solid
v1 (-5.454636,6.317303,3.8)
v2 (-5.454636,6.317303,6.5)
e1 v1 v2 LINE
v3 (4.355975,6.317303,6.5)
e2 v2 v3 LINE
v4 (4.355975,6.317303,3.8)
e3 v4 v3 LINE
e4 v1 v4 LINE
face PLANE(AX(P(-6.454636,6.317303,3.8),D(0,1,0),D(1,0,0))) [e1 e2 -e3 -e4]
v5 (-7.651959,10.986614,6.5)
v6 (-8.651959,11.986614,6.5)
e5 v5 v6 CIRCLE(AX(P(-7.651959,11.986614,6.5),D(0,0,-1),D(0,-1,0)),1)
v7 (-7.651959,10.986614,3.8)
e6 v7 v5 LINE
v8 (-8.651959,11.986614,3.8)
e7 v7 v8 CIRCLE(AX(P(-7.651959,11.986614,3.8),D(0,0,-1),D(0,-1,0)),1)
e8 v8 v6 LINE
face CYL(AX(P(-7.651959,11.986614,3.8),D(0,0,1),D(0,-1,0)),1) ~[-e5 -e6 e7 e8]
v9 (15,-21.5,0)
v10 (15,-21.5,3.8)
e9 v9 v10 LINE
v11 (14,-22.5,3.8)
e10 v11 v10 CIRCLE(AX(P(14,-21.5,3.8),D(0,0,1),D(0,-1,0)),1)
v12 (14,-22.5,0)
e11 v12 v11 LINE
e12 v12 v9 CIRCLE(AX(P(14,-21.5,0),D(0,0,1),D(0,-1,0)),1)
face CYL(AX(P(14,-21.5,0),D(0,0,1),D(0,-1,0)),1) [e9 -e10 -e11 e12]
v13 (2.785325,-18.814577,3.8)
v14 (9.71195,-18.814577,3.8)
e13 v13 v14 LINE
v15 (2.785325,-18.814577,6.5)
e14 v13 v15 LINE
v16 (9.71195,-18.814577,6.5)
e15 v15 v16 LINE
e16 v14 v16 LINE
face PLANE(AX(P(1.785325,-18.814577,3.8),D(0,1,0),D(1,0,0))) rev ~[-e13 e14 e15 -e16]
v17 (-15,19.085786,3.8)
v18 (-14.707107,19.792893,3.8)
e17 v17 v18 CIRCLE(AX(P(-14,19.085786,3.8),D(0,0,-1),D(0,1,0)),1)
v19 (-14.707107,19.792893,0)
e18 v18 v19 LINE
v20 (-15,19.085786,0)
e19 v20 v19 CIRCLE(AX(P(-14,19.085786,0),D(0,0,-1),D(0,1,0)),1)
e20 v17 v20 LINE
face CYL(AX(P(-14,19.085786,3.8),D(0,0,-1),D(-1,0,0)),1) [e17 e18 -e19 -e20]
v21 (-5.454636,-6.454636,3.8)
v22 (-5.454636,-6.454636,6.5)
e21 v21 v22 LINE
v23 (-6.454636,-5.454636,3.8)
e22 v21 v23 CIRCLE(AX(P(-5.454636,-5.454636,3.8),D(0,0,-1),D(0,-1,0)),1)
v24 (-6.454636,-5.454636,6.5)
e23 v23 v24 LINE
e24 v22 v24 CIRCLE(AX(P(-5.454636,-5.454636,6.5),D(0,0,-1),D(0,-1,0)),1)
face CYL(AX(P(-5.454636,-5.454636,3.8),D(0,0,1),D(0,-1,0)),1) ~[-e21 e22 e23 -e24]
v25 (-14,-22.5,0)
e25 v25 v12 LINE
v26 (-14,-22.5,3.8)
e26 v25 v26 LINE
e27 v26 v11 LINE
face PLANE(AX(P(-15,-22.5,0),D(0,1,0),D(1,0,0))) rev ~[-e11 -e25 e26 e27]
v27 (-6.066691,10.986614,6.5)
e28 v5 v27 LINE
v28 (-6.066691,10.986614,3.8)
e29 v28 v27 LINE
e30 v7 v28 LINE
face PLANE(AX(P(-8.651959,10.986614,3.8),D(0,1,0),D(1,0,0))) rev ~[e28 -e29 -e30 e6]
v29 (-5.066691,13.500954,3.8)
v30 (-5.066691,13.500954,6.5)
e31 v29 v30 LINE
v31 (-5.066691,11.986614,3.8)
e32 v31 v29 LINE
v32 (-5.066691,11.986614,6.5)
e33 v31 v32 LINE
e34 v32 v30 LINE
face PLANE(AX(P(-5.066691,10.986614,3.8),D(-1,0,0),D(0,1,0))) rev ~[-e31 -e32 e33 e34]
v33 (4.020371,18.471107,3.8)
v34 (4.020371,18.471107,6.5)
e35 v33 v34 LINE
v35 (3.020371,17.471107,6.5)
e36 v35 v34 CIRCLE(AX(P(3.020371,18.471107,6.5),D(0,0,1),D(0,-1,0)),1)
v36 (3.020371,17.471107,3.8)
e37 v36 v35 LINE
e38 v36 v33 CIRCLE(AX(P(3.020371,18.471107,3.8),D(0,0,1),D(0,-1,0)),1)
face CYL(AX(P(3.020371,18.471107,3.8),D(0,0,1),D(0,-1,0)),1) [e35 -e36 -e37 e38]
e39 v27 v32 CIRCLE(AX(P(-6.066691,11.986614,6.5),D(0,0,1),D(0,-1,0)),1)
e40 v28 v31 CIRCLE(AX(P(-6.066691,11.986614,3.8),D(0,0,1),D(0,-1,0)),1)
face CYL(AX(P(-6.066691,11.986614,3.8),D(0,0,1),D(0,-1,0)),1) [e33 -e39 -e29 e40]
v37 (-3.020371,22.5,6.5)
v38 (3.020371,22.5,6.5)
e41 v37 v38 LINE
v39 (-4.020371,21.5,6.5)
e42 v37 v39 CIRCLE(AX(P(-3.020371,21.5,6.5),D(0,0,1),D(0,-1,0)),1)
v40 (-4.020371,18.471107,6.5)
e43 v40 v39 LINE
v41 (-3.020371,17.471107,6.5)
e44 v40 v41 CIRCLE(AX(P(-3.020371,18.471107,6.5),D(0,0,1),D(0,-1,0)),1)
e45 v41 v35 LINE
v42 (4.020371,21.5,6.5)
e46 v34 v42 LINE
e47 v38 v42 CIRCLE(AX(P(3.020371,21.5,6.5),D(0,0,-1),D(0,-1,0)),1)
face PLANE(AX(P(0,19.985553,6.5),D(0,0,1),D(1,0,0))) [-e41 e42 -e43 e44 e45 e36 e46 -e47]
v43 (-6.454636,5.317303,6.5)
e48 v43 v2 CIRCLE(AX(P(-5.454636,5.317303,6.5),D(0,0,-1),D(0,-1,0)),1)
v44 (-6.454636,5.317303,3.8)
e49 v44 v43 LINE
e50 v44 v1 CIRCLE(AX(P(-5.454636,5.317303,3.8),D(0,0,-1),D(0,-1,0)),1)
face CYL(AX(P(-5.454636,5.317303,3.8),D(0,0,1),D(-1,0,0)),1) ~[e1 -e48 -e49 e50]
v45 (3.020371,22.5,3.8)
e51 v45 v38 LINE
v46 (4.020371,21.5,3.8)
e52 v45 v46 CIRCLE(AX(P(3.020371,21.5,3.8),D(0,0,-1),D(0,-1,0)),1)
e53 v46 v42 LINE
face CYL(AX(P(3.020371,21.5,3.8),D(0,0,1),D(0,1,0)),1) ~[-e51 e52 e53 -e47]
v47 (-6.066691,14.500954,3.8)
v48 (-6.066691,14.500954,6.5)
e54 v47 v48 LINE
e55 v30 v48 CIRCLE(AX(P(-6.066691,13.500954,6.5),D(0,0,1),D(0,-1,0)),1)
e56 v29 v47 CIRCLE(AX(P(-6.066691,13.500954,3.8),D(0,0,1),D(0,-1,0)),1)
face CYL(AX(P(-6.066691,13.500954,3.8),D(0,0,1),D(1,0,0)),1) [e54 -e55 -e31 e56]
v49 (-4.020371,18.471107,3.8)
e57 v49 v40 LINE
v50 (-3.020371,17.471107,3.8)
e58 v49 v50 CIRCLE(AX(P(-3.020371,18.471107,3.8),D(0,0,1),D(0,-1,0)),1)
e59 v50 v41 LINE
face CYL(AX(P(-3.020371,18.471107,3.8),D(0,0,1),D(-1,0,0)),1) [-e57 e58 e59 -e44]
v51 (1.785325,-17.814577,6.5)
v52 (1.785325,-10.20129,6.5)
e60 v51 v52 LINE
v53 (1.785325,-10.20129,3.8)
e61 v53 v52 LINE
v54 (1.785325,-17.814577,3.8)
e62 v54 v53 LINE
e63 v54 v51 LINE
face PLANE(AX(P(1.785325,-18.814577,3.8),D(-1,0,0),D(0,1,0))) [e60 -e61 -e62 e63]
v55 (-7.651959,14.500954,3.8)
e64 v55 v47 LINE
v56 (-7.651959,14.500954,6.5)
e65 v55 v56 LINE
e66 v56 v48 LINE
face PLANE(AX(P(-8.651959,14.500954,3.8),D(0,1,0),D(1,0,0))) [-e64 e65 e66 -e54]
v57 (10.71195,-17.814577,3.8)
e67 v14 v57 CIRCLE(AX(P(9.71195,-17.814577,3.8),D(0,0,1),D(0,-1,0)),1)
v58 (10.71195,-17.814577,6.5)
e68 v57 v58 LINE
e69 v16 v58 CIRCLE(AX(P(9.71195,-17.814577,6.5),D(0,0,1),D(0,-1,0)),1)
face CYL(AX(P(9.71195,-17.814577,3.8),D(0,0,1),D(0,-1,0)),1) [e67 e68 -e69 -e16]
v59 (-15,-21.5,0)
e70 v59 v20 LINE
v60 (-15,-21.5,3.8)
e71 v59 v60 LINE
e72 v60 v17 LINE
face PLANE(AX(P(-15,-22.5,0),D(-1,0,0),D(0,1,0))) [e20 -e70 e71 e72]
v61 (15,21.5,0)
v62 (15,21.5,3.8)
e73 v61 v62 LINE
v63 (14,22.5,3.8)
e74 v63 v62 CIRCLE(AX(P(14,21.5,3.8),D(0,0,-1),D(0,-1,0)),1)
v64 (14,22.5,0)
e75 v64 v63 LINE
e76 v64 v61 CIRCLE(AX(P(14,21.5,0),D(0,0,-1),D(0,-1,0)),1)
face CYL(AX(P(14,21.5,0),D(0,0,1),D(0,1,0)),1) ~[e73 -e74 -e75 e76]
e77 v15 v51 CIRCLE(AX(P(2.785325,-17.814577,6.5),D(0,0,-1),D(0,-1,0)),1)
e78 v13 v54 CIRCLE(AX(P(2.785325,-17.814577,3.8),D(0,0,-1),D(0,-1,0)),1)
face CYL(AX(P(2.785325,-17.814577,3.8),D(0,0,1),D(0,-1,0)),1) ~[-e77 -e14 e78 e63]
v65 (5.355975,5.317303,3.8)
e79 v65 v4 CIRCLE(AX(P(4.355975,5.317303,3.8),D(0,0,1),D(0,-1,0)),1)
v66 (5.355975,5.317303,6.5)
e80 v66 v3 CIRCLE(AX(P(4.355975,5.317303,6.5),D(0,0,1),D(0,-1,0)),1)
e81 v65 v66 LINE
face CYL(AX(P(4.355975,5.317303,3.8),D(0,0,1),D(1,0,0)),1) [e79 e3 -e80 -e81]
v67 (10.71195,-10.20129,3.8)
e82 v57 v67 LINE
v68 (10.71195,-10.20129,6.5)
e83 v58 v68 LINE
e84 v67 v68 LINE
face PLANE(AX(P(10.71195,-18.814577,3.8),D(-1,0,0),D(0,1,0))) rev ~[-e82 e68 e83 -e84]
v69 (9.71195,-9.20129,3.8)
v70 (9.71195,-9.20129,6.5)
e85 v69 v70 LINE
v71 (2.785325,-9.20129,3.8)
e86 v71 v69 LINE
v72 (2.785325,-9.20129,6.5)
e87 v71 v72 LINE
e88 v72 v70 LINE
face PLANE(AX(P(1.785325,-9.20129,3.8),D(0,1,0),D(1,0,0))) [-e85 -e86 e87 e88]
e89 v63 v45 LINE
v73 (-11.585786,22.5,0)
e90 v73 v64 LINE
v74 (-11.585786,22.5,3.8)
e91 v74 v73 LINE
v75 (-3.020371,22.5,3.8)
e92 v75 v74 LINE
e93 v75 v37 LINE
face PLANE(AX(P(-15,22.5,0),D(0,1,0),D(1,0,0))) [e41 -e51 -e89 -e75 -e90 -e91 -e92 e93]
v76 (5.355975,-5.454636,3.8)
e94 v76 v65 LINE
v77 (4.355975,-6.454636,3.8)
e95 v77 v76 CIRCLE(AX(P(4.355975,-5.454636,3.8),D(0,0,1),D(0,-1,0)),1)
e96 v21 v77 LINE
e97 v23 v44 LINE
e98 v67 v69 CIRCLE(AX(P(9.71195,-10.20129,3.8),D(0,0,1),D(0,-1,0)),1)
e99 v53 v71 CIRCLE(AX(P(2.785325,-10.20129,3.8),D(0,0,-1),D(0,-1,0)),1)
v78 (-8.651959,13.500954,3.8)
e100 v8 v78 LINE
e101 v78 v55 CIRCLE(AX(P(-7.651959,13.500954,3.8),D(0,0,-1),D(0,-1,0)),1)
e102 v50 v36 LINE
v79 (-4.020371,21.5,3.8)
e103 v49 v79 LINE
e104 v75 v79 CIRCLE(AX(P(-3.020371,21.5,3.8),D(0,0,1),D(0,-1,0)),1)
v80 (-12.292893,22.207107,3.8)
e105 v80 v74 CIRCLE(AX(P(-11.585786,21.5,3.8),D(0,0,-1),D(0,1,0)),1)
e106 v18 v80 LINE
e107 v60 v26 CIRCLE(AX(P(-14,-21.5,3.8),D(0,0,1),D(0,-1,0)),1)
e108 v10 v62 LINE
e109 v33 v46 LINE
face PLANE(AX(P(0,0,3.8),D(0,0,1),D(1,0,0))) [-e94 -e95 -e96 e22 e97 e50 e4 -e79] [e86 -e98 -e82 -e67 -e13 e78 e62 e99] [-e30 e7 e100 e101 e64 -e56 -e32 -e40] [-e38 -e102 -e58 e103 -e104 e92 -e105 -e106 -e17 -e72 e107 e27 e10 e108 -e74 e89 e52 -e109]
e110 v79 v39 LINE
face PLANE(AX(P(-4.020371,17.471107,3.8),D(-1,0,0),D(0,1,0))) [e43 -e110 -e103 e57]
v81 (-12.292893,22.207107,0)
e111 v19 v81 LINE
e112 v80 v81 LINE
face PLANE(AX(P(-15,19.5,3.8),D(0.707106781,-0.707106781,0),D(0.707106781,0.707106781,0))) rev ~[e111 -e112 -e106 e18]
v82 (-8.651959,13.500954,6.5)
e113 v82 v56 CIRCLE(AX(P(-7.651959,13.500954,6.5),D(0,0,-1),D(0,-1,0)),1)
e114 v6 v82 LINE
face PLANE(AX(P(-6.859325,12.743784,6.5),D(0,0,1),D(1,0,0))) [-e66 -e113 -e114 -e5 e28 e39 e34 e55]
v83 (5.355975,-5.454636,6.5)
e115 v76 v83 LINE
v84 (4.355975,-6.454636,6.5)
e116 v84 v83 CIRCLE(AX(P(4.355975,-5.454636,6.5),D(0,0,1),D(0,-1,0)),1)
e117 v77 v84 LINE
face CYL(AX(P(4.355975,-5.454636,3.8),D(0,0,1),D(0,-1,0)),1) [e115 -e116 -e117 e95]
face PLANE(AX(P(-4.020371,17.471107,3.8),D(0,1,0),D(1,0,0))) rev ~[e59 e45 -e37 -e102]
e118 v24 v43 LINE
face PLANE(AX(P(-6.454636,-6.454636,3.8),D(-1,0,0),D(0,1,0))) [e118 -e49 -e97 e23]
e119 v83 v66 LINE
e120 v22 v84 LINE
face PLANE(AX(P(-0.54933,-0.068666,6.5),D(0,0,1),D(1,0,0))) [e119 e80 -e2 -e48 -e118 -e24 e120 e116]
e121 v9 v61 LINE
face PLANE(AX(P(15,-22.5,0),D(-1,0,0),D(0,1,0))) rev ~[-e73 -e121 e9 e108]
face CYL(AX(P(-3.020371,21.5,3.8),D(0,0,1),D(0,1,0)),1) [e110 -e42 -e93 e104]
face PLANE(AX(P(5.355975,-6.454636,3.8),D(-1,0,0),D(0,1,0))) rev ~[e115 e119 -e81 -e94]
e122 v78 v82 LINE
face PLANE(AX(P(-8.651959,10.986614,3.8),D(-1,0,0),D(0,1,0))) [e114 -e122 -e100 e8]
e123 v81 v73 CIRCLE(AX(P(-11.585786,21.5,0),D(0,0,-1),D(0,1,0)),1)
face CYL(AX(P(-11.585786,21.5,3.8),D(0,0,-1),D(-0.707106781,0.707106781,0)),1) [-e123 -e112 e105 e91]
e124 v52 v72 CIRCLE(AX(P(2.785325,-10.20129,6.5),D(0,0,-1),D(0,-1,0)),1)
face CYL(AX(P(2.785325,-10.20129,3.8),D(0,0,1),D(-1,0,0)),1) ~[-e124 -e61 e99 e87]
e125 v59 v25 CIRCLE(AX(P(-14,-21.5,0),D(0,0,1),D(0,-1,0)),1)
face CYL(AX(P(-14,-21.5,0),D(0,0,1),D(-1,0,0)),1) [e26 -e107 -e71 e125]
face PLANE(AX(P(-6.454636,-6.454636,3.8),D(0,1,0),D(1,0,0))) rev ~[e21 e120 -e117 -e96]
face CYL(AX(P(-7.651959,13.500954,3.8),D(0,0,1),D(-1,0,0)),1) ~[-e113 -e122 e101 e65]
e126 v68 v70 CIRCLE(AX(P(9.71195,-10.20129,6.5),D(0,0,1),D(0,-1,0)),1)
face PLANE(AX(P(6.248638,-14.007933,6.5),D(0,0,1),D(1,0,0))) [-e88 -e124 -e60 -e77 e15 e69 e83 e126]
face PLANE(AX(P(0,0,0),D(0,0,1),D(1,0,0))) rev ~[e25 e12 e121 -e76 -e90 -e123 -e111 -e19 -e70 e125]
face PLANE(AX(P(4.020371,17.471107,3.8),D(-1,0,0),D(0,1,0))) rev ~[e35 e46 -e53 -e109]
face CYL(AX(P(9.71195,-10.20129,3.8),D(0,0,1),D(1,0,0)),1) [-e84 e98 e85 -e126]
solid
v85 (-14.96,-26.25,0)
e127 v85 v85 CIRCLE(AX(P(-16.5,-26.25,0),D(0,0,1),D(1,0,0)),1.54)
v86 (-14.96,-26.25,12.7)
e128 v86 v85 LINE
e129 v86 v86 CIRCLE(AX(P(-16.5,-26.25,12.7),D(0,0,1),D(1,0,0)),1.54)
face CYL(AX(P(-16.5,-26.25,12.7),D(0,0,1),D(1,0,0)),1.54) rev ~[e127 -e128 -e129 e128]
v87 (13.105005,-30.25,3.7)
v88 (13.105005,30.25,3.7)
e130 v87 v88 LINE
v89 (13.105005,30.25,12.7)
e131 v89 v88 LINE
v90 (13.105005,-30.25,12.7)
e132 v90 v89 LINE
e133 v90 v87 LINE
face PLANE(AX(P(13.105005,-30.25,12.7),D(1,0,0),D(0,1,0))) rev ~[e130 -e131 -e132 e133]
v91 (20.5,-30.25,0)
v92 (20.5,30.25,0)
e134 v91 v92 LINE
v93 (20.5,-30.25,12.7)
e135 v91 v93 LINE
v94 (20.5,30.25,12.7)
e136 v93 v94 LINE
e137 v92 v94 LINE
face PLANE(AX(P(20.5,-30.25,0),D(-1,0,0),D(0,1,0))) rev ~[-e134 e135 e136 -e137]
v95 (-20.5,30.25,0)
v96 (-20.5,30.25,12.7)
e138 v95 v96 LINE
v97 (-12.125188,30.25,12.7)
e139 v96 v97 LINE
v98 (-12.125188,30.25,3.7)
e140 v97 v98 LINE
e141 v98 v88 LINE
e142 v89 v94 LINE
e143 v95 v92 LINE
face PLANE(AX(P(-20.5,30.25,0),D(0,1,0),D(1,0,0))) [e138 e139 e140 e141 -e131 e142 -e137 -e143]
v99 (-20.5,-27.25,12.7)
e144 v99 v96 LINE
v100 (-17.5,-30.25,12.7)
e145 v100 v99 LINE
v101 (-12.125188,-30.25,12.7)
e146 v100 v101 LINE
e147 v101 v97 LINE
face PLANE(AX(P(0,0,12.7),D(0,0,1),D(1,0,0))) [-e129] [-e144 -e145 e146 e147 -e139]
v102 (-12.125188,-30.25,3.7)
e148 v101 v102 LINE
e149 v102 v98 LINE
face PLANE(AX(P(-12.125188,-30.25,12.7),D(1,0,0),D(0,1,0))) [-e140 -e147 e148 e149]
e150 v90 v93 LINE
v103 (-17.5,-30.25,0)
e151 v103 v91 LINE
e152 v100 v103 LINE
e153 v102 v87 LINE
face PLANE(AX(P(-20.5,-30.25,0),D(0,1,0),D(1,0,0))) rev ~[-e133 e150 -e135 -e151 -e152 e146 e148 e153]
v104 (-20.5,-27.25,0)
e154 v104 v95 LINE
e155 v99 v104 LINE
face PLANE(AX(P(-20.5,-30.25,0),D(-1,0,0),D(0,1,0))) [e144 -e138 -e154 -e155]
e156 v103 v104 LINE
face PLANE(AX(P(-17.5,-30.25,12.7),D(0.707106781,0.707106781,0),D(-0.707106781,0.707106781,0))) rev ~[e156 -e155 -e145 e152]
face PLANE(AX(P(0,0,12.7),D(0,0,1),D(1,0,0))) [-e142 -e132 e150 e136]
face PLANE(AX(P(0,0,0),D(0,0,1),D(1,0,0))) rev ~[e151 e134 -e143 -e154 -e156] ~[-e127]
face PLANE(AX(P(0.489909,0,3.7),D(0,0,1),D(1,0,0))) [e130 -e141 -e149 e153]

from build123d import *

# Parameters (mm, degrees)
F0_W      = 41
F0_H      = 60.5
F1_DEPTH  = 12.7
F2_R      = 1.54
F3_DEPTH  = 25
F4_W      = 25.2301925793
F4_H      = 60.5
F5_DEPTH  = 9
F6_W      = 30
F6_H      = 45
F7_DEPTH  = 3.8
F8_W      = 11.8106110021
F8_H      = 12.7719389275
F8_W_2    = 8.9266251307
F8_H_2    = 9.6132867038
F8_W_3    = 8.0407429487
F8_H_3    = 5.028893277
F8_W_4    = 3.5852673464
F8_H_4    = 3.5143401474
F9_DEPTH  = 2.7
F11_DEPTH = 25
F12_R     = 1
F13_R     = 1


with BuildPart() as f1:
    # F0 (on Top) → F1 (new body)
    with BuildSketch(Plane.XY):
        Rectangle(F0_W, F0_H)
    extrude(amount=F1_DEPTH)

    # F2 (on face) → F3 (cut)
    with BuildSketch(Plane.XY.offset(12.7)):
        Polygon((-17.5, -30.25), (-20.5, -27.25), (-20.5, -30.25), align=None)
        with Locations((-16.5, -26.25)):
            Circle(F2_R)
    extrude(amount=-F3_DEPTH, mode=Mode.SUBTRACT)

    # F4 (on face) → F5 (cut)
    with BuildSketch(Plane.XY.offset(12.7)):
        with Locations((0.4899087362, 0)):
            Rectangle(F4_W, F4_H)
    extrude(amount=-F5_DEPTH, mode=Mode.SUBTRACT)


with BuildPart() as f7:
    # F6 (on Top) → F7 (new body)
    with BuildSketch(Plane.XY):
        Rectangle(F6_W, F6_H)
    extrude(amount=F7_DEPTH)

    # F8 (on face) → F9 (join)
    with BuildSketch(Plane.XY.offset(3.8)):
        with Locations((-0.5493303761, -0.0686664134)):
            Rectangle(F8_W, F8_H)
        with Locations((6.2486376846, -14.0079334378)):
            Rectangle(F8_W_2, F8_H_2)
        with Locations((0, 19.9855533615)):
            Rectangle(F8_W_3, F8_H_3)
        with Locations((-6.8593251053, 12.7437841147)):
            Rectangle(F8_W_4, F8_H_4)
    extrude(amount=F9_DEPTH)

    # F10 (on face) → F11 (cut)
    with BuildSketch(Plane.XY.offset(3.8)):
        Polygon((-15, 22.5), (-15, 19.5), (-12, 22.5), align=None)
    extrude(amount=-F11_DEPTH, mode=Mode.SUBTRACT)

    # F12
    f12_edges = [f7.edges().sort_by_distance(p)[0] for p in [
        (15, 22.5, 1.9),
        (15, -22.5, 1.9),
        (-15, -22.5, 1.9),
        (-15, 19.5, 1.9),
        (-12, 22.5, 1.9),
    ]]
    fillet(f12_edges, radius=F12_R)

    # F13
    f13_edges = [f7.edges().sort_by_distance(p)[0] for p in [
        (5.355975, -6.454636, 5.15),
        (-6.454636, -6.454636, 5.15),
        (1.785325, -18.814577, 5.15),
        (10.71195, -18.814577, 5.15),
        (5.355975, 6.317303, 5.15),
        (-8.651959, 10.986614, 5.15),
        (-5.066691, 10.986614, 5.15),
        (-5.066691, 14.500954, 5.15),
        (-4.020371, 17.471107, 5.15),
        (4.020371, 17.471107, 5.15),
        (4.020371, 22.5, 5.15),
        (-6.454636, 6.317303, 5.15),
        (-8.651959, 14.500954, 5.15),
        (1.785325, -9.20129, 5.15),
        (-4.020371, 22.5, 5.15),
        (10.71195, -9.20129, 5.15),
    ]]
    fillet(f13_edges, radius=F13_R)


solid = Compound([f1.part, f7.part])
